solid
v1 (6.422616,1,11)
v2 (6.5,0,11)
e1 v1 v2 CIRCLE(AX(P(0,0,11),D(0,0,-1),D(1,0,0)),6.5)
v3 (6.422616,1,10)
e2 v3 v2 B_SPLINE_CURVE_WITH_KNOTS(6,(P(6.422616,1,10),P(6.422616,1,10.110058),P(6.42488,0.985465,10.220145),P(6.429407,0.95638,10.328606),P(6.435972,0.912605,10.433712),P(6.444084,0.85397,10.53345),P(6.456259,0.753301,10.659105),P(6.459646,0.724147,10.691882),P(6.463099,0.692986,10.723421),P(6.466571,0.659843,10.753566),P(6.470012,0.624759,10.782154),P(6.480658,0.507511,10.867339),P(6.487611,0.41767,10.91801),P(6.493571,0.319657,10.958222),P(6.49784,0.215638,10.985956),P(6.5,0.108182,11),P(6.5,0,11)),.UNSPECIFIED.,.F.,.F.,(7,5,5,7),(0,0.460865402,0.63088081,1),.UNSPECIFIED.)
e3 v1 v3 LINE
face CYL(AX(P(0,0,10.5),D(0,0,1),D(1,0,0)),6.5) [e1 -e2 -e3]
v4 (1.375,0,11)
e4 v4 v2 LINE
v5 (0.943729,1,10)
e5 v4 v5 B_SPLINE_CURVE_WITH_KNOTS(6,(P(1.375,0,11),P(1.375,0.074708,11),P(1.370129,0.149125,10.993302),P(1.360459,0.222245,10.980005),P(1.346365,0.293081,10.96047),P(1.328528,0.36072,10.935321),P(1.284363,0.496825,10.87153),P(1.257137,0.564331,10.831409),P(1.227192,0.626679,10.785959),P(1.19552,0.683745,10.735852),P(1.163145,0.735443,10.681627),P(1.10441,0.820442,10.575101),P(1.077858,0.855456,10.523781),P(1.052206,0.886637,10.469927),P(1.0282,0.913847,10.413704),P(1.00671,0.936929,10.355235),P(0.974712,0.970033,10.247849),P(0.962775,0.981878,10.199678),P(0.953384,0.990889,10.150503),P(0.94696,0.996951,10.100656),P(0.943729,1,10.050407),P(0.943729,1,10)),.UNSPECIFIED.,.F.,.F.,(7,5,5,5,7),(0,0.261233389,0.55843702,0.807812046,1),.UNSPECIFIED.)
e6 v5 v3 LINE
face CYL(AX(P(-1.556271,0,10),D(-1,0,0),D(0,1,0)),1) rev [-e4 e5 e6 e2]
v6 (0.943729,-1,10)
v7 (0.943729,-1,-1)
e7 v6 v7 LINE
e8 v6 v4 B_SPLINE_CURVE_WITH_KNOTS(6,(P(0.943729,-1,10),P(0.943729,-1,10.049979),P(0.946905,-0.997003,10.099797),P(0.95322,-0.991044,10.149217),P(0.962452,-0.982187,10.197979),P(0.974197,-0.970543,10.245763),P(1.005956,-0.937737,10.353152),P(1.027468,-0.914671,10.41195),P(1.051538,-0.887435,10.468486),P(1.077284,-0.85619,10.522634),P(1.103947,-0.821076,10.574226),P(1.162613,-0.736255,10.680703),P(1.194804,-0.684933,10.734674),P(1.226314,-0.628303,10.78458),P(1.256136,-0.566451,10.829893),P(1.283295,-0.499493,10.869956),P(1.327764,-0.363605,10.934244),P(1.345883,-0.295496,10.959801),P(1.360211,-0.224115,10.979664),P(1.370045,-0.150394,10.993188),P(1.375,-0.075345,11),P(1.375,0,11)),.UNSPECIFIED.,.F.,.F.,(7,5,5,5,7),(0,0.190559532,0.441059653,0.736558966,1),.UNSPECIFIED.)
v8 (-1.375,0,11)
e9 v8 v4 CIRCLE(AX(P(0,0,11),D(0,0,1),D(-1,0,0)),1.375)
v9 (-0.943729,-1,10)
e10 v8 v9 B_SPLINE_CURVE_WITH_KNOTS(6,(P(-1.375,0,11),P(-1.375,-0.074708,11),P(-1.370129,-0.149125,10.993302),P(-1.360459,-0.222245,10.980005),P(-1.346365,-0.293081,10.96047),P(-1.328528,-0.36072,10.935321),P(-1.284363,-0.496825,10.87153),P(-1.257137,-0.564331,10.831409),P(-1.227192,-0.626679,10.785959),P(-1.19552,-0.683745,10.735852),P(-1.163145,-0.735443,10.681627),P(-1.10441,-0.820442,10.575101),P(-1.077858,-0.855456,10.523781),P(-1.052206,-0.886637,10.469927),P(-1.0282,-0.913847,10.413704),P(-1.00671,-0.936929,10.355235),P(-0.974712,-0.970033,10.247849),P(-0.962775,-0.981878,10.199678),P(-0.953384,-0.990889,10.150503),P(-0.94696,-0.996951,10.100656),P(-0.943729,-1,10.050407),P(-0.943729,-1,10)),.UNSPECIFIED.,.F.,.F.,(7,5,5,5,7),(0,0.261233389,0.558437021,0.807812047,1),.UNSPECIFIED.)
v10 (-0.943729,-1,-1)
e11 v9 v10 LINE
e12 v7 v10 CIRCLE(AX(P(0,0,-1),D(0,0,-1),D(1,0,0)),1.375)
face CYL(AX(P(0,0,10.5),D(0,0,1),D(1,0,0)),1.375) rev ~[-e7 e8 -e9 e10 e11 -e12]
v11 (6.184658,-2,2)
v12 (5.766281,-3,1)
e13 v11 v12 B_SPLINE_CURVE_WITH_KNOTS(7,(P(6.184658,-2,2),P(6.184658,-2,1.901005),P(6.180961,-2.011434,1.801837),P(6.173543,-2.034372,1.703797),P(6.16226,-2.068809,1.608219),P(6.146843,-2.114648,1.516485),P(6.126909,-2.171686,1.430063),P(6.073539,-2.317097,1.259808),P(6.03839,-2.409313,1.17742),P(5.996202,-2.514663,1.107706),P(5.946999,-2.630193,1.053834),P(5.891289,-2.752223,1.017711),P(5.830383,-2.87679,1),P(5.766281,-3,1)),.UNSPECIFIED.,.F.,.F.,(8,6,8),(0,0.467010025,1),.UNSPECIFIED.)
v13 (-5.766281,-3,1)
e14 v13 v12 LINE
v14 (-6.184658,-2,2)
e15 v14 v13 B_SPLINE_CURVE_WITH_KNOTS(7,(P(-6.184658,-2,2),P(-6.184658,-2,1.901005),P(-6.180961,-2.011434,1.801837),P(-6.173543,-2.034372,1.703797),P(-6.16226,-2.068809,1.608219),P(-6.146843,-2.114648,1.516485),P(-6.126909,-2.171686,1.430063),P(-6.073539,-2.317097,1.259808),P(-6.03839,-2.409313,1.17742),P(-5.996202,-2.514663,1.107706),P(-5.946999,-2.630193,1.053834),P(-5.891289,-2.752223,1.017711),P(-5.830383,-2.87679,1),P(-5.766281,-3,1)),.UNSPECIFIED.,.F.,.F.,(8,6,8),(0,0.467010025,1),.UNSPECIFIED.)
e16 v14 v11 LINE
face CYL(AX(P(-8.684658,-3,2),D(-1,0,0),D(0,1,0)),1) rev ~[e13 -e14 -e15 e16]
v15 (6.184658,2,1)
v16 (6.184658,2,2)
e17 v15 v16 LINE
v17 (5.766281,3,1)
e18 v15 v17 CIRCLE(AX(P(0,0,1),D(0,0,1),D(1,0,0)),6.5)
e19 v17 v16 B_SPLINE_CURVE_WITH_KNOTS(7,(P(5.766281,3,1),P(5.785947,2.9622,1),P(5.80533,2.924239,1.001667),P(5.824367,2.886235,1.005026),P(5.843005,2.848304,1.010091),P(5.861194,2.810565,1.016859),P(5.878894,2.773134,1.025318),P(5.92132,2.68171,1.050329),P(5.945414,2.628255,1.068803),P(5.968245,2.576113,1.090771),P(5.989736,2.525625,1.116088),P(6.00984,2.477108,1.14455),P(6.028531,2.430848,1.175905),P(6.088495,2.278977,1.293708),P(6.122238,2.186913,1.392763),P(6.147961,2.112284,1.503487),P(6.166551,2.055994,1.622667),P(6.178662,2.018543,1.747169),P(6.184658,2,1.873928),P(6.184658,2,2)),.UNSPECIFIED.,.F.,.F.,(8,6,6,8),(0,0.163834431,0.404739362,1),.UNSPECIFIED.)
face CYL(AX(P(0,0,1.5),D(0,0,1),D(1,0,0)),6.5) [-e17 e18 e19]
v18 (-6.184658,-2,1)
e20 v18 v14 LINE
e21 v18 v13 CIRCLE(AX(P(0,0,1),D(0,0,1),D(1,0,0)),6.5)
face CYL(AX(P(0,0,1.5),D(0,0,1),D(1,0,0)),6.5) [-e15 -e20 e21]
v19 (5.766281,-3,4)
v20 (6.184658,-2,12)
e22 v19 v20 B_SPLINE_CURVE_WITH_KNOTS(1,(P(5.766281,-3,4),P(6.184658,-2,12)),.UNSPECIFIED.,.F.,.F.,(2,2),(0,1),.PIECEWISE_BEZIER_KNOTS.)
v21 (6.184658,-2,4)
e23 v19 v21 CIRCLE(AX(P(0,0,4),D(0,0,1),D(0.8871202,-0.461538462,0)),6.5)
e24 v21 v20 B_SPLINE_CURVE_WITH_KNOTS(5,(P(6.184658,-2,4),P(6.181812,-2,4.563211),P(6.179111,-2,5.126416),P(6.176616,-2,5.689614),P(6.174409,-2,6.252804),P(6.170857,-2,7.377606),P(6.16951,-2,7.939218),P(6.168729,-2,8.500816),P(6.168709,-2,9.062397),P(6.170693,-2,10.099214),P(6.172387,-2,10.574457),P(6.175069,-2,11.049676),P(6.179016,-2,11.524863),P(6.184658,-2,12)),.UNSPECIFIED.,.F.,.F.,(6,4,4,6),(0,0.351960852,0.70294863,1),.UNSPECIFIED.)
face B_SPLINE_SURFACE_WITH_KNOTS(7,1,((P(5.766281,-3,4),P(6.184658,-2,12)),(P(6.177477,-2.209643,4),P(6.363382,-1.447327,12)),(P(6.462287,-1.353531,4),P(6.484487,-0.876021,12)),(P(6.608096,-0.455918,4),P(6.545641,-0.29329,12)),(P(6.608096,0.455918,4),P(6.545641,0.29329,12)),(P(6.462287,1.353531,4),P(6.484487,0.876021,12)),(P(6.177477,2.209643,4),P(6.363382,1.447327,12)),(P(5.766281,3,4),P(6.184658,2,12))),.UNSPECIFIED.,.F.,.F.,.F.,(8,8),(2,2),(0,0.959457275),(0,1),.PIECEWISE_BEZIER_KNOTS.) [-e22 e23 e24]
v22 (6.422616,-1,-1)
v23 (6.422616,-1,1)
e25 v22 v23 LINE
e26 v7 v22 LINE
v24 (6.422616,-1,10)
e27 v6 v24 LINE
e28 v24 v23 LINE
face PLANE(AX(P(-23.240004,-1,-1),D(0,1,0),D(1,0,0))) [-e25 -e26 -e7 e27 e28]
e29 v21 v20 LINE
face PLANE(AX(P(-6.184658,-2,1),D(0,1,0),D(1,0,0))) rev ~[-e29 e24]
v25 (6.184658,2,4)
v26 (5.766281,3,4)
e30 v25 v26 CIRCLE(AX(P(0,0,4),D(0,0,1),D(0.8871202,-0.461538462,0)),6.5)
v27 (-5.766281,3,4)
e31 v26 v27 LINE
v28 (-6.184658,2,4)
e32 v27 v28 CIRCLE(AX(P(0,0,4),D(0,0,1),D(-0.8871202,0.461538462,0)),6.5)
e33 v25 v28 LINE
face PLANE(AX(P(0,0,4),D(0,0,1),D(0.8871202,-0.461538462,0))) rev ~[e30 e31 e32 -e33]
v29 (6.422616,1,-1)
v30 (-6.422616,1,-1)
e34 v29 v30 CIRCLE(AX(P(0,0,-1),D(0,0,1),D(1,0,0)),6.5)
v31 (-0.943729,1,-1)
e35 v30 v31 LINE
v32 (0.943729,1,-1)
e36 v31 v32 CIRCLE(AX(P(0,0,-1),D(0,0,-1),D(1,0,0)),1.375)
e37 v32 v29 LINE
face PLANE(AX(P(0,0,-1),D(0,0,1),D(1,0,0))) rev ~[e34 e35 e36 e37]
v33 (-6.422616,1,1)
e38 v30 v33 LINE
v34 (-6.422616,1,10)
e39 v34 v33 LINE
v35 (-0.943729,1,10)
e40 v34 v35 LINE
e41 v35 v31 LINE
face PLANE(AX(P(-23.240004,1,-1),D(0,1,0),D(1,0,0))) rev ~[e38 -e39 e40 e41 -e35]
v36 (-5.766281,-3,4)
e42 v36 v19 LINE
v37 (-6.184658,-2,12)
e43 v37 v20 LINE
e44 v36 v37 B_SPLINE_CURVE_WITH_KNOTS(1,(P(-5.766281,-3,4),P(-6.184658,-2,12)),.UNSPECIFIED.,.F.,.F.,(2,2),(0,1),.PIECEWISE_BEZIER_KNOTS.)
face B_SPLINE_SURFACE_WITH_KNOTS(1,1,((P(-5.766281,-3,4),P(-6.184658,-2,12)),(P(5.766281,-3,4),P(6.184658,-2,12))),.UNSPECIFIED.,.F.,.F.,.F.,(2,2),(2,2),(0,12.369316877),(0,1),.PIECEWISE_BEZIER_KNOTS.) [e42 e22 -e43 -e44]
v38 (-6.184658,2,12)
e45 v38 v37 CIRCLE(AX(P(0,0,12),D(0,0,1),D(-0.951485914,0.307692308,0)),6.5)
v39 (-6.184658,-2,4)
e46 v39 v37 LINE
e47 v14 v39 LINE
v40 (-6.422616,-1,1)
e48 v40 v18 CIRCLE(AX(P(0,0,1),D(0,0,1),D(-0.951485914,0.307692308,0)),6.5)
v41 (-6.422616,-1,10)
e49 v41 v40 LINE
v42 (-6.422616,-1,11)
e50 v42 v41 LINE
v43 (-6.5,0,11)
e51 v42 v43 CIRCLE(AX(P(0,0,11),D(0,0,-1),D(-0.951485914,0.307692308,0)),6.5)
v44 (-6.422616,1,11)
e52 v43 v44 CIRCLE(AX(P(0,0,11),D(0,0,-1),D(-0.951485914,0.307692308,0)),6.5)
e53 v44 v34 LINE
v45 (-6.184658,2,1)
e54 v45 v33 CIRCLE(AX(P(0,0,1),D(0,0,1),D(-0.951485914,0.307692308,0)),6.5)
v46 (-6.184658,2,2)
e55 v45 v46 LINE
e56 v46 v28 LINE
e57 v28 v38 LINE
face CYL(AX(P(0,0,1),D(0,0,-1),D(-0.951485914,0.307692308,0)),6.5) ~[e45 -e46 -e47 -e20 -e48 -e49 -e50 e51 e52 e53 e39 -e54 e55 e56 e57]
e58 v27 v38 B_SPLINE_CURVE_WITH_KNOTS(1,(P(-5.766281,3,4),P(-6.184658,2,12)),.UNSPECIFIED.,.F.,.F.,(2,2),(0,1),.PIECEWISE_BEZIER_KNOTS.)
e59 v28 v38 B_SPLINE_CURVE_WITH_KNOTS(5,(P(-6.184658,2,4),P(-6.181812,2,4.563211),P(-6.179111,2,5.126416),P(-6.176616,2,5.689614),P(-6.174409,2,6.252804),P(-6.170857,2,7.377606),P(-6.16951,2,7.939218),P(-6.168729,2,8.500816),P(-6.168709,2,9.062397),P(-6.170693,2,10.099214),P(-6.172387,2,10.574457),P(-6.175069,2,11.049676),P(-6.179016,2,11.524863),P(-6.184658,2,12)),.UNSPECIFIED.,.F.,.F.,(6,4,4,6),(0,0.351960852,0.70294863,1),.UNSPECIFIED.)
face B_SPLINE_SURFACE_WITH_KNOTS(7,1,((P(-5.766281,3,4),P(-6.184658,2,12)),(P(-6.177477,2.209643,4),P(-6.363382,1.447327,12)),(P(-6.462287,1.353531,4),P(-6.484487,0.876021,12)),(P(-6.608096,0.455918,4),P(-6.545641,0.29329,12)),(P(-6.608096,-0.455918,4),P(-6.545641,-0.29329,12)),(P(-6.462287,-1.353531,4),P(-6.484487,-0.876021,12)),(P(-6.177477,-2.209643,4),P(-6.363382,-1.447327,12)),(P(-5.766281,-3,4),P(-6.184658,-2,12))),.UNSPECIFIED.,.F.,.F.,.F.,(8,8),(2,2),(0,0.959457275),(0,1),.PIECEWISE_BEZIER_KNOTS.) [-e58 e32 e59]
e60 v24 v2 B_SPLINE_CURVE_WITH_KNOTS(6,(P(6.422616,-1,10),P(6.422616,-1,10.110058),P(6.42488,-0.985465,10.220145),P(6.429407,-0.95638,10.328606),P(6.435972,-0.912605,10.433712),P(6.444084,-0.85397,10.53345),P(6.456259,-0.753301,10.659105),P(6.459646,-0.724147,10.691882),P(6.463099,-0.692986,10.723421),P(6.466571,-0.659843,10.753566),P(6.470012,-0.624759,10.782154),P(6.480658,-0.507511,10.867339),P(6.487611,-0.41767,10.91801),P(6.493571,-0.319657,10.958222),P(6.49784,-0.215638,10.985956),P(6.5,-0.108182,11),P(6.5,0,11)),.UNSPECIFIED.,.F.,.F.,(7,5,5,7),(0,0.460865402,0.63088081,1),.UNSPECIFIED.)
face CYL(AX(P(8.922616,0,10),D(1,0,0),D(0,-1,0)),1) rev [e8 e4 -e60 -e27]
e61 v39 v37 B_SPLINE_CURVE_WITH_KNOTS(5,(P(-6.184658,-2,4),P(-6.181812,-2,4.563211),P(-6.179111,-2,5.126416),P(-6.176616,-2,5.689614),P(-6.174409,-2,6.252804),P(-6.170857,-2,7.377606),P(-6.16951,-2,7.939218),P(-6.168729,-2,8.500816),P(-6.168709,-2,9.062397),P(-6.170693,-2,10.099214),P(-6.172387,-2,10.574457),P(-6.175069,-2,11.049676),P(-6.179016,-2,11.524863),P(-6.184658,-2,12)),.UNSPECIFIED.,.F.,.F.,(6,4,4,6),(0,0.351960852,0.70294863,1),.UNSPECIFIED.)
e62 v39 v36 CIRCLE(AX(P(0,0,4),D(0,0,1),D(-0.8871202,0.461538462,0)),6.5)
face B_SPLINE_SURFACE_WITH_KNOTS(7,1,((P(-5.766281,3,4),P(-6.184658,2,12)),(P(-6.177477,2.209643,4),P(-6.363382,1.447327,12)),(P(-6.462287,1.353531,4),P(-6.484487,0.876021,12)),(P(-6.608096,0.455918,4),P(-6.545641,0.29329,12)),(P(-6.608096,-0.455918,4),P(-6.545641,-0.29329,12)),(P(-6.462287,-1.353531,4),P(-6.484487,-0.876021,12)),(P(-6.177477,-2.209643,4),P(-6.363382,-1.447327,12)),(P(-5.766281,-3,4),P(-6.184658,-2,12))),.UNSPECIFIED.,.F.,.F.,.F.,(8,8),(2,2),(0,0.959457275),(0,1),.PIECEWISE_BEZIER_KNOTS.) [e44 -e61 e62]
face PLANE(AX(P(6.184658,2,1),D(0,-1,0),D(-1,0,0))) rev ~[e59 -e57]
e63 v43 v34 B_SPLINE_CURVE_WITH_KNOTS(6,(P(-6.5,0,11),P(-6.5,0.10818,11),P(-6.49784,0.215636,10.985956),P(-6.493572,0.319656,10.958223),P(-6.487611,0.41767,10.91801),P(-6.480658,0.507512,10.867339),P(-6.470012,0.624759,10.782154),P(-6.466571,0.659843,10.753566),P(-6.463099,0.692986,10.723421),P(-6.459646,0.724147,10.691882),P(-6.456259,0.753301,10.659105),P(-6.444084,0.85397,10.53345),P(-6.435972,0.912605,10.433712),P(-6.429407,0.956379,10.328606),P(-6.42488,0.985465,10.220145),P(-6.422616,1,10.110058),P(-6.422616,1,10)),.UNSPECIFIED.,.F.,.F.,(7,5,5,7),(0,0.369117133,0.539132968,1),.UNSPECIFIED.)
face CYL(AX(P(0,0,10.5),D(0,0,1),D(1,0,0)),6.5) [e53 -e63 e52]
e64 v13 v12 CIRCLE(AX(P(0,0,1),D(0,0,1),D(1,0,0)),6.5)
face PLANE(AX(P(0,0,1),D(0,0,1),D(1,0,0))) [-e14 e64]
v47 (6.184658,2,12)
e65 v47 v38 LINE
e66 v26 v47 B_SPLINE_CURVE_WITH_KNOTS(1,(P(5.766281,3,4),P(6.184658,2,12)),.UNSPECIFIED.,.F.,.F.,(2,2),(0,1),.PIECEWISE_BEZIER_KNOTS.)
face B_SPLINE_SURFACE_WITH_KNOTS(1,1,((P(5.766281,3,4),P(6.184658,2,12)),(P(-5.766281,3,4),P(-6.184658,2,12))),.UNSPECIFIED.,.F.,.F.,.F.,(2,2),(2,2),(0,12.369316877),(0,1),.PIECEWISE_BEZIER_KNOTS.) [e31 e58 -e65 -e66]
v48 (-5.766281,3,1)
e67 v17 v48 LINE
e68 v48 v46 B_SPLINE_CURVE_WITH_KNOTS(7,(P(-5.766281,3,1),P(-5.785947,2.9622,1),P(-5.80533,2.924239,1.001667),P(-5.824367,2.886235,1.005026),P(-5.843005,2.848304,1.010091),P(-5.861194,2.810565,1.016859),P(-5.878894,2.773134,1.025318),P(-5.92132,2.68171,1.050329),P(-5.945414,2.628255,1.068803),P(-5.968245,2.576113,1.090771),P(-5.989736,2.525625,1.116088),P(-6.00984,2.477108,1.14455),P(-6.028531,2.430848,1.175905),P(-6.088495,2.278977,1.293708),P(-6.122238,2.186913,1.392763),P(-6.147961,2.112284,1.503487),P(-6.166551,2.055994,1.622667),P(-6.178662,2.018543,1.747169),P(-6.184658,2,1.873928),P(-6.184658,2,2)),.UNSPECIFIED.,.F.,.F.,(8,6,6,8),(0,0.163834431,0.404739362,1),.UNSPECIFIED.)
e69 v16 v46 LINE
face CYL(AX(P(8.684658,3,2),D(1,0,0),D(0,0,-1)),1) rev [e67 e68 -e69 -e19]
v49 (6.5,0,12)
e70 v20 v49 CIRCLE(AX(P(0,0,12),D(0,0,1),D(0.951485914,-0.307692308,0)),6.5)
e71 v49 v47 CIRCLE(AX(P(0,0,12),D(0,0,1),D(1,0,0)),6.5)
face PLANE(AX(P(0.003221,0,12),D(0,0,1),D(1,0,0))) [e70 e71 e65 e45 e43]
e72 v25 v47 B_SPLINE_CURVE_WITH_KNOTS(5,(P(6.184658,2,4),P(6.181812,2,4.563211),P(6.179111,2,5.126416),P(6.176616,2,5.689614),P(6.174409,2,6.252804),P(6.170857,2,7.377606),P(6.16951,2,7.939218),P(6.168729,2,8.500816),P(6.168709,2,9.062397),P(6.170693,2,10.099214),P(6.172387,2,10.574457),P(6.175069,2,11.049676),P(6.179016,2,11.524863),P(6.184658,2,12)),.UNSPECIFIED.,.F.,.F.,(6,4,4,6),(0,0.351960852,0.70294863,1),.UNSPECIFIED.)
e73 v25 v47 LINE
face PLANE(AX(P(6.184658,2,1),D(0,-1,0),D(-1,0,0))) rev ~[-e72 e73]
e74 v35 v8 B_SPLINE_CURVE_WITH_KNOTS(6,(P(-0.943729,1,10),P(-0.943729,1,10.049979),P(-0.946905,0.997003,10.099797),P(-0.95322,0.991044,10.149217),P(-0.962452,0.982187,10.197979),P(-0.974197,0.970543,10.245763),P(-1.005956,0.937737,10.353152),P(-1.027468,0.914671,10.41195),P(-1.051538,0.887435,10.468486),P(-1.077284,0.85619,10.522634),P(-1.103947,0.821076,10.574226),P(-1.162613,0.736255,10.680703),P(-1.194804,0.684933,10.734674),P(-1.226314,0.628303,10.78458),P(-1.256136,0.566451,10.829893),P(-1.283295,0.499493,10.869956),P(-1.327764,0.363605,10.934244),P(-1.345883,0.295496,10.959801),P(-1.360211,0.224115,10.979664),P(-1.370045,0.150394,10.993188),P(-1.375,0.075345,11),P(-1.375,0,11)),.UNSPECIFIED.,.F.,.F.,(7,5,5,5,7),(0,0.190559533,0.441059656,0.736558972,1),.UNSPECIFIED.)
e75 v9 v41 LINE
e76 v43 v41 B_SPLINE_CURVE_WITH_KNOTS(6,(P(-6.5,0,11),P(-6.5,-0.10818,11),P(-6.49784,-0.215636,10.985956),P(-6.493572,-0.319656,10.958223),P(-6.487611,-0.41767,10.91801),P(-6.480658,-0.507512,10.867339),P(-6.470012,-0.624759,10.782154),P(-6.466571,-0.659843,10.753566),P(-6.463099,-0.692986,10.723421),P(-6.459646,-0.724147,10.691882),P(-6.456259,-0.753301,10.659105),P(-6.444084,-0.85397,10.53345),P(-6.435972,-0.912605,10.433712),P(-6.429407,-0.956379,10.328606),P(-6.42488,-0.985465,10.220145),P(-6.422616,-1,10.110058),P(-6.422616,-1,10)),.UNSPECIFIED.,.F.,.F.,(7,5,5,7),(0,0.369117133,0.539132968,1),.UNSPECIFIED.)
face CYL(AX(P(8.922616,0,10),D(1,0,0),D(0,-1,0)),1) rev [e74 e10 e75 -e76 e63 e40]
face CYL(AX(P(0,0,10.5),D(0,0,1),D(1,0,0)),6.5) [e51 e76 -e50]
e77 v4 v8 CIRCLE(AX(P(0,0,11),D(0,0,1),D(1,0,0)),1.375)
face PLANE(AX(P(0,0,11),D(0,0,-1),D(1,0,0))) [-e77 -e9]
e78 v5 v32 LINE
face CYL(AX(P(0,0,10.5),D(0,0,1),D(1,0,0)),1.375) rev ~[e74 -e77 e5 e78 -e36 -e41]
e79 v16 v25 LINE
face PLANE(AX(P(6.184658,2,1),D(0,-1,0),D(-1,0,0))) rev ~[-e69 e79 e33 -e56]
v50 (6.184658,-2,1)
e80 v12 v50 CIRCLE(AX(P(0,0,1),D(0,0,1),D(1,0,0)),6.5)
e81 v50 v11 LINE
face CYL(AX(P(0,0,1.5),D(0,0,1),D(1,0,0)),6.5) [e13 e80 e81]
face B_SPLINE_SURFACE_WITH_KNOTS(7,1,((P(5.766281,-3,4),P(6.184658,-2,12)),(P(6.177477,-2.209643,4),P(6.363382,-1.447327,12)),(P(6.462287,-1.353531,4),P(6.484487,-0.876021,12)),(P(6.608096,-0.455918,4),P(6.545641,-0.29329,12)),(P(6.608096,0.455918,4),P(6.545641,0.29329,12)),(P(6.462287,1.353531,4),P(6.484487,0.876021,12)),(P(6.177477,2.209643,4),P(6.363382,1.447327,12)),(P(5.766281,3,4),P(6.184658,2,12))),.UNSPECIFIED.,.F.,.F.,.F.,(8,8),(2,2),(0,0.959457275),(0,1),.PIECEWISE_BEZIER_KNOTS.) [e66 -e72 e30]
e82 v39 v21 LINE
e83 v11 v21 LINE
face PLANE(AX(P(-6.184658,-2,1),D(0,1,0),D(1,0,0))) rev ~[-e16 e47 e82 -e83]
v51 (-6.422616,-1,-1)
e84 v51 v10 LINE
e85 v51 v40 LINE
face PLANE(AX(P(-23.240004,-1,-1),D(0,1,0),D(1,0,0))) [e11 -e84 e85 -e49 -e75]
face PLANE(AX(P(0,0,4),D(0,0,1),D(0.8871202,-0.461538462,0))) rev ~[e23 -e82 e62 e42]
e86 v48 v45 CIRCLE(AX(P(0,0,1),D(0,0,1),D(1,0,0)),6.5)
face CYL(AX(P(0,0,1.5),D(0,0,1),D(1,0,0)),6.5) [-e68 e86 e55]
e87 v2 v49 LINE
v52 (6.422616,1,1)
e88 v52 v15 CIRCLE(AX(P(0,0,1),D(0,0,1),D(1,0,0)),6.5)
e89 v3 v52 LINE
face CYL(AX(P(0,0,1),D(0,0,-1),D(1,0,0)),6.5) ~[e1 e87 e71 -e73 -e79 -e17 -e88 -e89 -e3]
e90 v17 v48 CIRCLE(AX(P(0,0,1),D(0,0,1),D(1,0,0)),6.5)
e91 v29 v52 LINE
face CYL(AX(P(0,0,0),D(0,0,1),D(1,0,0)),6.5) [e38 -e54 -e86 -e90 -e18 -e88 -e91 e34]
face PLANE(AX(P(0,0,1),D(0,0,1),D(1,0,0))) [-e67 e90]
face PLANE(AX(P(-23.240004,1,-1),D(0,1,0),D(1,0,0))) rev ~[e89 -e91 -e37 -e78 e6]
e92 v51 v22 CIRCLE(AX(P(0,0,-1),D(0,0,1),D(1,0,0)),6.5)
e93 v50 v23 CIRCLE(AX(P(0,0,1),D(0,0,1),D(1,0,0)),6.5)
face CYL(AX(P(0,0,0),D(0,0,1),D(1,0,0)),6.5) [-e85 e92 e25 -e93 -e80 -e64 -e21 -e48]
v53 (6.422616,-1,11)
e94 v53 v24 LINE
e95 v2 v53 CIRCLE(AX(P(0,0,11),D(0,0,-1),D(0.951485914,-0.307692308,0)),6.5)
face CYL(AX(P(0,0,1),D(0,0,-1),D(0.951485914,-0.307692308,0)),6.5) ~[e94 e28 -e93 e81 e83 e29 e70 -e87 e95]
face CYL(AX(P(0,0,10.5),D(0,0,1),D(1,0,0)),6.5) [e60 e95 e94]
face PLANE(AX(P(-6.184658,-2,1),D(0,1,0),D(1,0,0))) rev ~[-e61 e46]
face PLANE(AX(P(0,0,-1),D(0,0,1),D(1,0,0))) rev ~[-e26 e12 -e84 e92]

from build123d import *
from build123d import SkipClean  # not in build123d's __all__

# Parameters (mm, degrees)
F0_R          = 6.5
F1_DEPTH      = 1
F3_DEPTH      = 11
F7_R          = 1.375
F8_DEPTH      = 12
F9_W          = 46.4800073215
F9_H          = 2
F10_DEPTH     = 12
F11_T4_DEPTH  = 10.4788869849
F11_S5_R      = 1.375
F11_T6_DEPTH  = 7
F11_S7_R      = 6.5
F11_T8_DEPTH  = 7
F11_T12_DEPTH = 10.4788869849
F11_S13_R     = 6.5
F11_T14_DEPTH = 7
F11_S15_R     = 1.375
F11_T16_DEPTH = 7
F11_T20_DEPTH = 10.4788869849
F11_S21_R     = 1.375
F11_T22_DEPTH = 7
F11_S23_R     = 6.5
F11_T24_DEPTH = 7
F11_T28_DEPTH = 10.4788869849
F11_S29_R     = 1.375
F11_T30_DEPTH = 7
F11_S31_R     = 6.5
F11_T32_DEPTH = 7
F11_T36_DEPTH = 17.3693168769
F11_S37_R     = 6.5
F11_T38_DEPTH = 10
F11_T42_DEPTH = 17.3693168769
F11_S43_R     = 6.5
F11_T44_DEPTH = 10


# Not quite as in the source:
# - a fillet or chamfer that OpenCascade refuses, or shapes differently, is made with other operations: its cross-section is extruded or revolved along the edge and cut away or added
# - after a boolean that leaves OpenCascade's solid faulty, fix() repairs it


with BuildPart() as f1:
    # F0 (on Top) → F1 (new body, symmetric)
    with BuildSketch(Plane.XY):
        Circle(F0_R)
    extrude(amount=F1_DEPTH, both=True)

    # F2 (on face) → F3 (join)
    with BuildSketch(Plane.XY.offset(1)):
        with BuildLine():
            ThreePointArc((6.5, 0), (6.4206806434, 1.0123537302), (6.1846584384, 2))
            Line((6.1846584384, 2), (-6.1846584384, 2))
            ThreePointArc((-6.1846584384, 2), (-6.5, 0), (-6.1846584384, -2))
            Line((-6.1846584384, -2), (6.1846584384, -2))
            ThreePointArc((6.1846584384, -2), (6.4206806434, -1.0123537302), (6.5, 0))
        make_face()
    with SkipClean():  # cleaning this boolean's faces spoils the solid; the shape is the same uncleaned
        extrude(amount=F3_DEPTH)

    # F5 (on offset) → F6 section 0
    with BuildSketch(Plane.XY.offset(4)):
        with BuildLine():
            ThreePointArc((5.7662812973, -3), (6.5, 0), (5.7662812973, 3))
            Line((5.7662812973, 3), (-5.7662812973, 3))
            ThreePointArc((-5.7662812973, 3), (-6.5, 0), (-5.7662812973, -3))
            Line((-5.7662812973, -3), (5.7662812973, -3))
        make_face()
    # F3_face (on face) → F6 section 1
    with BuildSketch(Plane.XY.offset(12)):
        with BuildLine():
            ThreePointArc((6.1846584384, -2), (6.5, 0), (6.1846584384, 2))
            Line((6.1846584384, 2), (-6.1846584384, 2))
            ThreePointArc((-6.1846584384, 2), (-6.5, 0), (-6.1846584384, -2))
            Line((-6.1846584384, -2), (6.1846584384, -2))
        make_face()
    loft()

    add(f1.part.fix(), mode=Mode.REPLACE)

    # F7 (on face) → F8 (cut)
    with BuildSketch(Plane(origin=(0, 0, -1), x_dir=(1, 0, 0), z_dir=(0, 0, -1))):
        Circle(F7_R)
    extrude(amount=-F8_DEPTH, mode=Mode.SUBTRACT)

    # F9 (on face) → F10 (cut)
    with BuildSketch(Plane(origin=(0, 0, -1), x_dir=(1, 0, 0), z_dir=(0, 0, -1))):
        Rectangle(F9_W, F9_H)
    extrude(amount=-F10_DEPTH, mode=Mode.SUBTRACT)

    # F11: fillet of radius 1 on 8 edges, made by hand


with BuildPart() as f11_tool2:
    # F11_s3 → F11_t4 (new body)
    with BuildSketch(Plane.YZ.offset(-8.9226162893)):
        with BuildLine():
            ThreePointArc((0, 11), (0.7071067812, 10.7071067812), (1, 10))
            Line((1, 10), (1, 11))
            Line((1, 11), (0, 11))
        make_face()
    extrude(amount=F11_T4_DEPTH)

    # F11_s5 → F11_t6 (cut, symmetric)
    with BuildSketch(Plane.XY.offset(10.5)):
        Circle(F11_S5_R)
    extrude(amount=F11_T6_DEPTH, both=True, mode=Mode.SUBTRACT)

    # F11_s7 → F11_t8 (intersect, symmetric)
    with BuildSketch(Plane.XY.offset(10.5)):
        Circle(F11_S7_R)
    extrude(amount=F11_T8_DEPTH, both=True, mode=Mode.INTERSECT)


with BuildPart() as f1_1:
    add(f1.part, clean=False)

    # F11_t1: union F11_tool2
    add(f11_tool2.part)


with BuildPart() as f11_tool10:
    # F11_s11 → F11_t12 (new body)
    with BuildSketch(Plane.YZ.offset(-1.5562706956)):
        with BuildLine():
            ThreePointArc((1, 10), (0.7071067812, 10.7071067812), (0, 11))
            Line((0, 11), (1, 11))
            Line((1, 11), (1, 10))
        make_face()
    extrude(amount=F11_T12_DEPTH)

    # F11_s13 → F11_t14 (intersect, symmetric)
    with BuildSketch(Plane.XY.offset(10.5)):
        Circle(F11_S13_R)
    extrude(amount=F11_T14_DEPTH, both=True, mode=Mode.INTERSECT)

    # F11_s15 → F11_t16 (cut, symmetric)
    with BuildSketch(Plane.XY.offset(10.5)):
        Circle(F11_S15_R)
    extrude(amount=F11_T16_DEPTH, both=True, mode=Mode.SUBTRACT)


with BuildPart() as f1_2:
    add(f1_1.part, clean=False)

    # F11_t9: union F11_tool10
    add(f11_tool10.part)


with BuildPart() as f11_tool18:
    # F11_s19 → F11_t20 (new body)
    with BuildSketch(Plane.YZ.offset(8.9226162893)):
        with BuildLine():
            ThreePointArc((-1, 10), (-0.7071067812, 10.7071067812), (0, 11))
            Line((0, 11), (-1, 11))
            Line((-1, 11), (-1, 10))
        make_face()
    extrude(amount=-F11_T20_DEPTH)

    # F11_s21 → F11_t22 (cut, symmetric)
    with BuildSketch(Plane.XY.offset(10.5)):
        Circle(F11_S21_R)
    extrude(amount=F11_T22_DEPTH, both=True, mode=Mode.SUBTRACT)

    # F11_s23 → F11_t24 (intersect, symmetric)
    with BuildSketch(Plane.XY.offset(10.5)):
        Circle(F11_S23_R)
    extrude(amount=F11_T24_DEPTH, both=True, mode=Mode.INTERSECT)


with BuildPart() as f1_3:
    add(f1_2.part, clean=False)

    # F11_t17: union F11_tool18
    add(f11_tool18.part)


with BuildPart() as f11_tool26:
    # F11_s27 → F11_t28 (new body)
    with BuildSketch(Plane.YZ.offset(1.5562706956)):
        with BuildLine():
            ThreePointArc((0, 11), (-0.7071067812, 10.7071067812), (-1, 10))
            Line((-1, 10), (-1, 11))
            Line((-1, 11), (0, 11))
        make_face()
    extrude(amount=-F11_T28_DEPTH)

    # F11_s29 → F11_t30 (cut, symmetric)
    with BuildSketch(Plane.XY.offset(10.5)):
        Circle(F11_S29_R)
    extrude(amount=F11_T30_DEPTH, both=True, mode=Mode.SUBTRACT)

    # F11_s31 → F11_t32 (intersect, symmetric)
    with BuildSketch(Plane.XY.offset(10.5)):
        Circle(F11_S31_R)
    extrude(amount=F11_T32_DEPTH, both=True, mode=Mode.INTERSECT)


with BuildPart() as f1_4:
    add(f1_3.part, clean=False)

    # F11_t25: union F11_tool26
    add(f11_tool26.part)


with BuildPart() as f11_tool34:
    # F11_s35 → F11_t36 (new body)
    with BuildSketch(Plane.YZ.offset(8.6846584384)):
        with BuildLine():
            ThreePointArc((3, 1), (2.2928932188, 1.2928932188), (2, 2))
            Line((2, 2), (2, 1))
            Line((2, 1), (3, 1))
        make_face()
    extrude(amount=-F11_T36_DEPTH)

    # F11_s37 → F11_t38 (intersect, symmetric)
    with BuildSketch(Plane.XY.offset(1.5)):
        Circle(F11_S37_R)
    extrude(amount=F11_T38_DEPTH, both=True, mode=Mode.INTERSECT)


with BuildPart() as f1_5:
    add(f1_4.part, clean=False)

    # F11_t33: union F11_tool34
    add(f11_tool34.part)


with BuildPart() as f11_tool40:
    # F11_s41 → F11_t42 (new body)
    with BuildSketch(Plane.YZ.offset(-8.6846584384)):
        with BuildLine():
            ThreePointArc((-2, 2), (-2.2928932188, 1.2928932188), (-3, 1))
            Line((-3, 1), (-2, 1))
            Line((-2, 1), (-2, 2))
        make_face()
    extrude(amount=F11_T42_DEPTH)

    # F11_s43 → F11_t44 (intersect, symmetric)
    with BuildSketch(Plane.XY.offset(1.5)):
        Circle(F11_S43_R)
    extrude(amount=F11_T44_DEPTH, both=True, mode=Mode.INTERSECT)


with BuildPart() as f1_6:
    add(f1_5.part, clean=False)

    # F11_t39: union F11_tool40
    add(f11_tool40.part)


solid = f1_6.part
